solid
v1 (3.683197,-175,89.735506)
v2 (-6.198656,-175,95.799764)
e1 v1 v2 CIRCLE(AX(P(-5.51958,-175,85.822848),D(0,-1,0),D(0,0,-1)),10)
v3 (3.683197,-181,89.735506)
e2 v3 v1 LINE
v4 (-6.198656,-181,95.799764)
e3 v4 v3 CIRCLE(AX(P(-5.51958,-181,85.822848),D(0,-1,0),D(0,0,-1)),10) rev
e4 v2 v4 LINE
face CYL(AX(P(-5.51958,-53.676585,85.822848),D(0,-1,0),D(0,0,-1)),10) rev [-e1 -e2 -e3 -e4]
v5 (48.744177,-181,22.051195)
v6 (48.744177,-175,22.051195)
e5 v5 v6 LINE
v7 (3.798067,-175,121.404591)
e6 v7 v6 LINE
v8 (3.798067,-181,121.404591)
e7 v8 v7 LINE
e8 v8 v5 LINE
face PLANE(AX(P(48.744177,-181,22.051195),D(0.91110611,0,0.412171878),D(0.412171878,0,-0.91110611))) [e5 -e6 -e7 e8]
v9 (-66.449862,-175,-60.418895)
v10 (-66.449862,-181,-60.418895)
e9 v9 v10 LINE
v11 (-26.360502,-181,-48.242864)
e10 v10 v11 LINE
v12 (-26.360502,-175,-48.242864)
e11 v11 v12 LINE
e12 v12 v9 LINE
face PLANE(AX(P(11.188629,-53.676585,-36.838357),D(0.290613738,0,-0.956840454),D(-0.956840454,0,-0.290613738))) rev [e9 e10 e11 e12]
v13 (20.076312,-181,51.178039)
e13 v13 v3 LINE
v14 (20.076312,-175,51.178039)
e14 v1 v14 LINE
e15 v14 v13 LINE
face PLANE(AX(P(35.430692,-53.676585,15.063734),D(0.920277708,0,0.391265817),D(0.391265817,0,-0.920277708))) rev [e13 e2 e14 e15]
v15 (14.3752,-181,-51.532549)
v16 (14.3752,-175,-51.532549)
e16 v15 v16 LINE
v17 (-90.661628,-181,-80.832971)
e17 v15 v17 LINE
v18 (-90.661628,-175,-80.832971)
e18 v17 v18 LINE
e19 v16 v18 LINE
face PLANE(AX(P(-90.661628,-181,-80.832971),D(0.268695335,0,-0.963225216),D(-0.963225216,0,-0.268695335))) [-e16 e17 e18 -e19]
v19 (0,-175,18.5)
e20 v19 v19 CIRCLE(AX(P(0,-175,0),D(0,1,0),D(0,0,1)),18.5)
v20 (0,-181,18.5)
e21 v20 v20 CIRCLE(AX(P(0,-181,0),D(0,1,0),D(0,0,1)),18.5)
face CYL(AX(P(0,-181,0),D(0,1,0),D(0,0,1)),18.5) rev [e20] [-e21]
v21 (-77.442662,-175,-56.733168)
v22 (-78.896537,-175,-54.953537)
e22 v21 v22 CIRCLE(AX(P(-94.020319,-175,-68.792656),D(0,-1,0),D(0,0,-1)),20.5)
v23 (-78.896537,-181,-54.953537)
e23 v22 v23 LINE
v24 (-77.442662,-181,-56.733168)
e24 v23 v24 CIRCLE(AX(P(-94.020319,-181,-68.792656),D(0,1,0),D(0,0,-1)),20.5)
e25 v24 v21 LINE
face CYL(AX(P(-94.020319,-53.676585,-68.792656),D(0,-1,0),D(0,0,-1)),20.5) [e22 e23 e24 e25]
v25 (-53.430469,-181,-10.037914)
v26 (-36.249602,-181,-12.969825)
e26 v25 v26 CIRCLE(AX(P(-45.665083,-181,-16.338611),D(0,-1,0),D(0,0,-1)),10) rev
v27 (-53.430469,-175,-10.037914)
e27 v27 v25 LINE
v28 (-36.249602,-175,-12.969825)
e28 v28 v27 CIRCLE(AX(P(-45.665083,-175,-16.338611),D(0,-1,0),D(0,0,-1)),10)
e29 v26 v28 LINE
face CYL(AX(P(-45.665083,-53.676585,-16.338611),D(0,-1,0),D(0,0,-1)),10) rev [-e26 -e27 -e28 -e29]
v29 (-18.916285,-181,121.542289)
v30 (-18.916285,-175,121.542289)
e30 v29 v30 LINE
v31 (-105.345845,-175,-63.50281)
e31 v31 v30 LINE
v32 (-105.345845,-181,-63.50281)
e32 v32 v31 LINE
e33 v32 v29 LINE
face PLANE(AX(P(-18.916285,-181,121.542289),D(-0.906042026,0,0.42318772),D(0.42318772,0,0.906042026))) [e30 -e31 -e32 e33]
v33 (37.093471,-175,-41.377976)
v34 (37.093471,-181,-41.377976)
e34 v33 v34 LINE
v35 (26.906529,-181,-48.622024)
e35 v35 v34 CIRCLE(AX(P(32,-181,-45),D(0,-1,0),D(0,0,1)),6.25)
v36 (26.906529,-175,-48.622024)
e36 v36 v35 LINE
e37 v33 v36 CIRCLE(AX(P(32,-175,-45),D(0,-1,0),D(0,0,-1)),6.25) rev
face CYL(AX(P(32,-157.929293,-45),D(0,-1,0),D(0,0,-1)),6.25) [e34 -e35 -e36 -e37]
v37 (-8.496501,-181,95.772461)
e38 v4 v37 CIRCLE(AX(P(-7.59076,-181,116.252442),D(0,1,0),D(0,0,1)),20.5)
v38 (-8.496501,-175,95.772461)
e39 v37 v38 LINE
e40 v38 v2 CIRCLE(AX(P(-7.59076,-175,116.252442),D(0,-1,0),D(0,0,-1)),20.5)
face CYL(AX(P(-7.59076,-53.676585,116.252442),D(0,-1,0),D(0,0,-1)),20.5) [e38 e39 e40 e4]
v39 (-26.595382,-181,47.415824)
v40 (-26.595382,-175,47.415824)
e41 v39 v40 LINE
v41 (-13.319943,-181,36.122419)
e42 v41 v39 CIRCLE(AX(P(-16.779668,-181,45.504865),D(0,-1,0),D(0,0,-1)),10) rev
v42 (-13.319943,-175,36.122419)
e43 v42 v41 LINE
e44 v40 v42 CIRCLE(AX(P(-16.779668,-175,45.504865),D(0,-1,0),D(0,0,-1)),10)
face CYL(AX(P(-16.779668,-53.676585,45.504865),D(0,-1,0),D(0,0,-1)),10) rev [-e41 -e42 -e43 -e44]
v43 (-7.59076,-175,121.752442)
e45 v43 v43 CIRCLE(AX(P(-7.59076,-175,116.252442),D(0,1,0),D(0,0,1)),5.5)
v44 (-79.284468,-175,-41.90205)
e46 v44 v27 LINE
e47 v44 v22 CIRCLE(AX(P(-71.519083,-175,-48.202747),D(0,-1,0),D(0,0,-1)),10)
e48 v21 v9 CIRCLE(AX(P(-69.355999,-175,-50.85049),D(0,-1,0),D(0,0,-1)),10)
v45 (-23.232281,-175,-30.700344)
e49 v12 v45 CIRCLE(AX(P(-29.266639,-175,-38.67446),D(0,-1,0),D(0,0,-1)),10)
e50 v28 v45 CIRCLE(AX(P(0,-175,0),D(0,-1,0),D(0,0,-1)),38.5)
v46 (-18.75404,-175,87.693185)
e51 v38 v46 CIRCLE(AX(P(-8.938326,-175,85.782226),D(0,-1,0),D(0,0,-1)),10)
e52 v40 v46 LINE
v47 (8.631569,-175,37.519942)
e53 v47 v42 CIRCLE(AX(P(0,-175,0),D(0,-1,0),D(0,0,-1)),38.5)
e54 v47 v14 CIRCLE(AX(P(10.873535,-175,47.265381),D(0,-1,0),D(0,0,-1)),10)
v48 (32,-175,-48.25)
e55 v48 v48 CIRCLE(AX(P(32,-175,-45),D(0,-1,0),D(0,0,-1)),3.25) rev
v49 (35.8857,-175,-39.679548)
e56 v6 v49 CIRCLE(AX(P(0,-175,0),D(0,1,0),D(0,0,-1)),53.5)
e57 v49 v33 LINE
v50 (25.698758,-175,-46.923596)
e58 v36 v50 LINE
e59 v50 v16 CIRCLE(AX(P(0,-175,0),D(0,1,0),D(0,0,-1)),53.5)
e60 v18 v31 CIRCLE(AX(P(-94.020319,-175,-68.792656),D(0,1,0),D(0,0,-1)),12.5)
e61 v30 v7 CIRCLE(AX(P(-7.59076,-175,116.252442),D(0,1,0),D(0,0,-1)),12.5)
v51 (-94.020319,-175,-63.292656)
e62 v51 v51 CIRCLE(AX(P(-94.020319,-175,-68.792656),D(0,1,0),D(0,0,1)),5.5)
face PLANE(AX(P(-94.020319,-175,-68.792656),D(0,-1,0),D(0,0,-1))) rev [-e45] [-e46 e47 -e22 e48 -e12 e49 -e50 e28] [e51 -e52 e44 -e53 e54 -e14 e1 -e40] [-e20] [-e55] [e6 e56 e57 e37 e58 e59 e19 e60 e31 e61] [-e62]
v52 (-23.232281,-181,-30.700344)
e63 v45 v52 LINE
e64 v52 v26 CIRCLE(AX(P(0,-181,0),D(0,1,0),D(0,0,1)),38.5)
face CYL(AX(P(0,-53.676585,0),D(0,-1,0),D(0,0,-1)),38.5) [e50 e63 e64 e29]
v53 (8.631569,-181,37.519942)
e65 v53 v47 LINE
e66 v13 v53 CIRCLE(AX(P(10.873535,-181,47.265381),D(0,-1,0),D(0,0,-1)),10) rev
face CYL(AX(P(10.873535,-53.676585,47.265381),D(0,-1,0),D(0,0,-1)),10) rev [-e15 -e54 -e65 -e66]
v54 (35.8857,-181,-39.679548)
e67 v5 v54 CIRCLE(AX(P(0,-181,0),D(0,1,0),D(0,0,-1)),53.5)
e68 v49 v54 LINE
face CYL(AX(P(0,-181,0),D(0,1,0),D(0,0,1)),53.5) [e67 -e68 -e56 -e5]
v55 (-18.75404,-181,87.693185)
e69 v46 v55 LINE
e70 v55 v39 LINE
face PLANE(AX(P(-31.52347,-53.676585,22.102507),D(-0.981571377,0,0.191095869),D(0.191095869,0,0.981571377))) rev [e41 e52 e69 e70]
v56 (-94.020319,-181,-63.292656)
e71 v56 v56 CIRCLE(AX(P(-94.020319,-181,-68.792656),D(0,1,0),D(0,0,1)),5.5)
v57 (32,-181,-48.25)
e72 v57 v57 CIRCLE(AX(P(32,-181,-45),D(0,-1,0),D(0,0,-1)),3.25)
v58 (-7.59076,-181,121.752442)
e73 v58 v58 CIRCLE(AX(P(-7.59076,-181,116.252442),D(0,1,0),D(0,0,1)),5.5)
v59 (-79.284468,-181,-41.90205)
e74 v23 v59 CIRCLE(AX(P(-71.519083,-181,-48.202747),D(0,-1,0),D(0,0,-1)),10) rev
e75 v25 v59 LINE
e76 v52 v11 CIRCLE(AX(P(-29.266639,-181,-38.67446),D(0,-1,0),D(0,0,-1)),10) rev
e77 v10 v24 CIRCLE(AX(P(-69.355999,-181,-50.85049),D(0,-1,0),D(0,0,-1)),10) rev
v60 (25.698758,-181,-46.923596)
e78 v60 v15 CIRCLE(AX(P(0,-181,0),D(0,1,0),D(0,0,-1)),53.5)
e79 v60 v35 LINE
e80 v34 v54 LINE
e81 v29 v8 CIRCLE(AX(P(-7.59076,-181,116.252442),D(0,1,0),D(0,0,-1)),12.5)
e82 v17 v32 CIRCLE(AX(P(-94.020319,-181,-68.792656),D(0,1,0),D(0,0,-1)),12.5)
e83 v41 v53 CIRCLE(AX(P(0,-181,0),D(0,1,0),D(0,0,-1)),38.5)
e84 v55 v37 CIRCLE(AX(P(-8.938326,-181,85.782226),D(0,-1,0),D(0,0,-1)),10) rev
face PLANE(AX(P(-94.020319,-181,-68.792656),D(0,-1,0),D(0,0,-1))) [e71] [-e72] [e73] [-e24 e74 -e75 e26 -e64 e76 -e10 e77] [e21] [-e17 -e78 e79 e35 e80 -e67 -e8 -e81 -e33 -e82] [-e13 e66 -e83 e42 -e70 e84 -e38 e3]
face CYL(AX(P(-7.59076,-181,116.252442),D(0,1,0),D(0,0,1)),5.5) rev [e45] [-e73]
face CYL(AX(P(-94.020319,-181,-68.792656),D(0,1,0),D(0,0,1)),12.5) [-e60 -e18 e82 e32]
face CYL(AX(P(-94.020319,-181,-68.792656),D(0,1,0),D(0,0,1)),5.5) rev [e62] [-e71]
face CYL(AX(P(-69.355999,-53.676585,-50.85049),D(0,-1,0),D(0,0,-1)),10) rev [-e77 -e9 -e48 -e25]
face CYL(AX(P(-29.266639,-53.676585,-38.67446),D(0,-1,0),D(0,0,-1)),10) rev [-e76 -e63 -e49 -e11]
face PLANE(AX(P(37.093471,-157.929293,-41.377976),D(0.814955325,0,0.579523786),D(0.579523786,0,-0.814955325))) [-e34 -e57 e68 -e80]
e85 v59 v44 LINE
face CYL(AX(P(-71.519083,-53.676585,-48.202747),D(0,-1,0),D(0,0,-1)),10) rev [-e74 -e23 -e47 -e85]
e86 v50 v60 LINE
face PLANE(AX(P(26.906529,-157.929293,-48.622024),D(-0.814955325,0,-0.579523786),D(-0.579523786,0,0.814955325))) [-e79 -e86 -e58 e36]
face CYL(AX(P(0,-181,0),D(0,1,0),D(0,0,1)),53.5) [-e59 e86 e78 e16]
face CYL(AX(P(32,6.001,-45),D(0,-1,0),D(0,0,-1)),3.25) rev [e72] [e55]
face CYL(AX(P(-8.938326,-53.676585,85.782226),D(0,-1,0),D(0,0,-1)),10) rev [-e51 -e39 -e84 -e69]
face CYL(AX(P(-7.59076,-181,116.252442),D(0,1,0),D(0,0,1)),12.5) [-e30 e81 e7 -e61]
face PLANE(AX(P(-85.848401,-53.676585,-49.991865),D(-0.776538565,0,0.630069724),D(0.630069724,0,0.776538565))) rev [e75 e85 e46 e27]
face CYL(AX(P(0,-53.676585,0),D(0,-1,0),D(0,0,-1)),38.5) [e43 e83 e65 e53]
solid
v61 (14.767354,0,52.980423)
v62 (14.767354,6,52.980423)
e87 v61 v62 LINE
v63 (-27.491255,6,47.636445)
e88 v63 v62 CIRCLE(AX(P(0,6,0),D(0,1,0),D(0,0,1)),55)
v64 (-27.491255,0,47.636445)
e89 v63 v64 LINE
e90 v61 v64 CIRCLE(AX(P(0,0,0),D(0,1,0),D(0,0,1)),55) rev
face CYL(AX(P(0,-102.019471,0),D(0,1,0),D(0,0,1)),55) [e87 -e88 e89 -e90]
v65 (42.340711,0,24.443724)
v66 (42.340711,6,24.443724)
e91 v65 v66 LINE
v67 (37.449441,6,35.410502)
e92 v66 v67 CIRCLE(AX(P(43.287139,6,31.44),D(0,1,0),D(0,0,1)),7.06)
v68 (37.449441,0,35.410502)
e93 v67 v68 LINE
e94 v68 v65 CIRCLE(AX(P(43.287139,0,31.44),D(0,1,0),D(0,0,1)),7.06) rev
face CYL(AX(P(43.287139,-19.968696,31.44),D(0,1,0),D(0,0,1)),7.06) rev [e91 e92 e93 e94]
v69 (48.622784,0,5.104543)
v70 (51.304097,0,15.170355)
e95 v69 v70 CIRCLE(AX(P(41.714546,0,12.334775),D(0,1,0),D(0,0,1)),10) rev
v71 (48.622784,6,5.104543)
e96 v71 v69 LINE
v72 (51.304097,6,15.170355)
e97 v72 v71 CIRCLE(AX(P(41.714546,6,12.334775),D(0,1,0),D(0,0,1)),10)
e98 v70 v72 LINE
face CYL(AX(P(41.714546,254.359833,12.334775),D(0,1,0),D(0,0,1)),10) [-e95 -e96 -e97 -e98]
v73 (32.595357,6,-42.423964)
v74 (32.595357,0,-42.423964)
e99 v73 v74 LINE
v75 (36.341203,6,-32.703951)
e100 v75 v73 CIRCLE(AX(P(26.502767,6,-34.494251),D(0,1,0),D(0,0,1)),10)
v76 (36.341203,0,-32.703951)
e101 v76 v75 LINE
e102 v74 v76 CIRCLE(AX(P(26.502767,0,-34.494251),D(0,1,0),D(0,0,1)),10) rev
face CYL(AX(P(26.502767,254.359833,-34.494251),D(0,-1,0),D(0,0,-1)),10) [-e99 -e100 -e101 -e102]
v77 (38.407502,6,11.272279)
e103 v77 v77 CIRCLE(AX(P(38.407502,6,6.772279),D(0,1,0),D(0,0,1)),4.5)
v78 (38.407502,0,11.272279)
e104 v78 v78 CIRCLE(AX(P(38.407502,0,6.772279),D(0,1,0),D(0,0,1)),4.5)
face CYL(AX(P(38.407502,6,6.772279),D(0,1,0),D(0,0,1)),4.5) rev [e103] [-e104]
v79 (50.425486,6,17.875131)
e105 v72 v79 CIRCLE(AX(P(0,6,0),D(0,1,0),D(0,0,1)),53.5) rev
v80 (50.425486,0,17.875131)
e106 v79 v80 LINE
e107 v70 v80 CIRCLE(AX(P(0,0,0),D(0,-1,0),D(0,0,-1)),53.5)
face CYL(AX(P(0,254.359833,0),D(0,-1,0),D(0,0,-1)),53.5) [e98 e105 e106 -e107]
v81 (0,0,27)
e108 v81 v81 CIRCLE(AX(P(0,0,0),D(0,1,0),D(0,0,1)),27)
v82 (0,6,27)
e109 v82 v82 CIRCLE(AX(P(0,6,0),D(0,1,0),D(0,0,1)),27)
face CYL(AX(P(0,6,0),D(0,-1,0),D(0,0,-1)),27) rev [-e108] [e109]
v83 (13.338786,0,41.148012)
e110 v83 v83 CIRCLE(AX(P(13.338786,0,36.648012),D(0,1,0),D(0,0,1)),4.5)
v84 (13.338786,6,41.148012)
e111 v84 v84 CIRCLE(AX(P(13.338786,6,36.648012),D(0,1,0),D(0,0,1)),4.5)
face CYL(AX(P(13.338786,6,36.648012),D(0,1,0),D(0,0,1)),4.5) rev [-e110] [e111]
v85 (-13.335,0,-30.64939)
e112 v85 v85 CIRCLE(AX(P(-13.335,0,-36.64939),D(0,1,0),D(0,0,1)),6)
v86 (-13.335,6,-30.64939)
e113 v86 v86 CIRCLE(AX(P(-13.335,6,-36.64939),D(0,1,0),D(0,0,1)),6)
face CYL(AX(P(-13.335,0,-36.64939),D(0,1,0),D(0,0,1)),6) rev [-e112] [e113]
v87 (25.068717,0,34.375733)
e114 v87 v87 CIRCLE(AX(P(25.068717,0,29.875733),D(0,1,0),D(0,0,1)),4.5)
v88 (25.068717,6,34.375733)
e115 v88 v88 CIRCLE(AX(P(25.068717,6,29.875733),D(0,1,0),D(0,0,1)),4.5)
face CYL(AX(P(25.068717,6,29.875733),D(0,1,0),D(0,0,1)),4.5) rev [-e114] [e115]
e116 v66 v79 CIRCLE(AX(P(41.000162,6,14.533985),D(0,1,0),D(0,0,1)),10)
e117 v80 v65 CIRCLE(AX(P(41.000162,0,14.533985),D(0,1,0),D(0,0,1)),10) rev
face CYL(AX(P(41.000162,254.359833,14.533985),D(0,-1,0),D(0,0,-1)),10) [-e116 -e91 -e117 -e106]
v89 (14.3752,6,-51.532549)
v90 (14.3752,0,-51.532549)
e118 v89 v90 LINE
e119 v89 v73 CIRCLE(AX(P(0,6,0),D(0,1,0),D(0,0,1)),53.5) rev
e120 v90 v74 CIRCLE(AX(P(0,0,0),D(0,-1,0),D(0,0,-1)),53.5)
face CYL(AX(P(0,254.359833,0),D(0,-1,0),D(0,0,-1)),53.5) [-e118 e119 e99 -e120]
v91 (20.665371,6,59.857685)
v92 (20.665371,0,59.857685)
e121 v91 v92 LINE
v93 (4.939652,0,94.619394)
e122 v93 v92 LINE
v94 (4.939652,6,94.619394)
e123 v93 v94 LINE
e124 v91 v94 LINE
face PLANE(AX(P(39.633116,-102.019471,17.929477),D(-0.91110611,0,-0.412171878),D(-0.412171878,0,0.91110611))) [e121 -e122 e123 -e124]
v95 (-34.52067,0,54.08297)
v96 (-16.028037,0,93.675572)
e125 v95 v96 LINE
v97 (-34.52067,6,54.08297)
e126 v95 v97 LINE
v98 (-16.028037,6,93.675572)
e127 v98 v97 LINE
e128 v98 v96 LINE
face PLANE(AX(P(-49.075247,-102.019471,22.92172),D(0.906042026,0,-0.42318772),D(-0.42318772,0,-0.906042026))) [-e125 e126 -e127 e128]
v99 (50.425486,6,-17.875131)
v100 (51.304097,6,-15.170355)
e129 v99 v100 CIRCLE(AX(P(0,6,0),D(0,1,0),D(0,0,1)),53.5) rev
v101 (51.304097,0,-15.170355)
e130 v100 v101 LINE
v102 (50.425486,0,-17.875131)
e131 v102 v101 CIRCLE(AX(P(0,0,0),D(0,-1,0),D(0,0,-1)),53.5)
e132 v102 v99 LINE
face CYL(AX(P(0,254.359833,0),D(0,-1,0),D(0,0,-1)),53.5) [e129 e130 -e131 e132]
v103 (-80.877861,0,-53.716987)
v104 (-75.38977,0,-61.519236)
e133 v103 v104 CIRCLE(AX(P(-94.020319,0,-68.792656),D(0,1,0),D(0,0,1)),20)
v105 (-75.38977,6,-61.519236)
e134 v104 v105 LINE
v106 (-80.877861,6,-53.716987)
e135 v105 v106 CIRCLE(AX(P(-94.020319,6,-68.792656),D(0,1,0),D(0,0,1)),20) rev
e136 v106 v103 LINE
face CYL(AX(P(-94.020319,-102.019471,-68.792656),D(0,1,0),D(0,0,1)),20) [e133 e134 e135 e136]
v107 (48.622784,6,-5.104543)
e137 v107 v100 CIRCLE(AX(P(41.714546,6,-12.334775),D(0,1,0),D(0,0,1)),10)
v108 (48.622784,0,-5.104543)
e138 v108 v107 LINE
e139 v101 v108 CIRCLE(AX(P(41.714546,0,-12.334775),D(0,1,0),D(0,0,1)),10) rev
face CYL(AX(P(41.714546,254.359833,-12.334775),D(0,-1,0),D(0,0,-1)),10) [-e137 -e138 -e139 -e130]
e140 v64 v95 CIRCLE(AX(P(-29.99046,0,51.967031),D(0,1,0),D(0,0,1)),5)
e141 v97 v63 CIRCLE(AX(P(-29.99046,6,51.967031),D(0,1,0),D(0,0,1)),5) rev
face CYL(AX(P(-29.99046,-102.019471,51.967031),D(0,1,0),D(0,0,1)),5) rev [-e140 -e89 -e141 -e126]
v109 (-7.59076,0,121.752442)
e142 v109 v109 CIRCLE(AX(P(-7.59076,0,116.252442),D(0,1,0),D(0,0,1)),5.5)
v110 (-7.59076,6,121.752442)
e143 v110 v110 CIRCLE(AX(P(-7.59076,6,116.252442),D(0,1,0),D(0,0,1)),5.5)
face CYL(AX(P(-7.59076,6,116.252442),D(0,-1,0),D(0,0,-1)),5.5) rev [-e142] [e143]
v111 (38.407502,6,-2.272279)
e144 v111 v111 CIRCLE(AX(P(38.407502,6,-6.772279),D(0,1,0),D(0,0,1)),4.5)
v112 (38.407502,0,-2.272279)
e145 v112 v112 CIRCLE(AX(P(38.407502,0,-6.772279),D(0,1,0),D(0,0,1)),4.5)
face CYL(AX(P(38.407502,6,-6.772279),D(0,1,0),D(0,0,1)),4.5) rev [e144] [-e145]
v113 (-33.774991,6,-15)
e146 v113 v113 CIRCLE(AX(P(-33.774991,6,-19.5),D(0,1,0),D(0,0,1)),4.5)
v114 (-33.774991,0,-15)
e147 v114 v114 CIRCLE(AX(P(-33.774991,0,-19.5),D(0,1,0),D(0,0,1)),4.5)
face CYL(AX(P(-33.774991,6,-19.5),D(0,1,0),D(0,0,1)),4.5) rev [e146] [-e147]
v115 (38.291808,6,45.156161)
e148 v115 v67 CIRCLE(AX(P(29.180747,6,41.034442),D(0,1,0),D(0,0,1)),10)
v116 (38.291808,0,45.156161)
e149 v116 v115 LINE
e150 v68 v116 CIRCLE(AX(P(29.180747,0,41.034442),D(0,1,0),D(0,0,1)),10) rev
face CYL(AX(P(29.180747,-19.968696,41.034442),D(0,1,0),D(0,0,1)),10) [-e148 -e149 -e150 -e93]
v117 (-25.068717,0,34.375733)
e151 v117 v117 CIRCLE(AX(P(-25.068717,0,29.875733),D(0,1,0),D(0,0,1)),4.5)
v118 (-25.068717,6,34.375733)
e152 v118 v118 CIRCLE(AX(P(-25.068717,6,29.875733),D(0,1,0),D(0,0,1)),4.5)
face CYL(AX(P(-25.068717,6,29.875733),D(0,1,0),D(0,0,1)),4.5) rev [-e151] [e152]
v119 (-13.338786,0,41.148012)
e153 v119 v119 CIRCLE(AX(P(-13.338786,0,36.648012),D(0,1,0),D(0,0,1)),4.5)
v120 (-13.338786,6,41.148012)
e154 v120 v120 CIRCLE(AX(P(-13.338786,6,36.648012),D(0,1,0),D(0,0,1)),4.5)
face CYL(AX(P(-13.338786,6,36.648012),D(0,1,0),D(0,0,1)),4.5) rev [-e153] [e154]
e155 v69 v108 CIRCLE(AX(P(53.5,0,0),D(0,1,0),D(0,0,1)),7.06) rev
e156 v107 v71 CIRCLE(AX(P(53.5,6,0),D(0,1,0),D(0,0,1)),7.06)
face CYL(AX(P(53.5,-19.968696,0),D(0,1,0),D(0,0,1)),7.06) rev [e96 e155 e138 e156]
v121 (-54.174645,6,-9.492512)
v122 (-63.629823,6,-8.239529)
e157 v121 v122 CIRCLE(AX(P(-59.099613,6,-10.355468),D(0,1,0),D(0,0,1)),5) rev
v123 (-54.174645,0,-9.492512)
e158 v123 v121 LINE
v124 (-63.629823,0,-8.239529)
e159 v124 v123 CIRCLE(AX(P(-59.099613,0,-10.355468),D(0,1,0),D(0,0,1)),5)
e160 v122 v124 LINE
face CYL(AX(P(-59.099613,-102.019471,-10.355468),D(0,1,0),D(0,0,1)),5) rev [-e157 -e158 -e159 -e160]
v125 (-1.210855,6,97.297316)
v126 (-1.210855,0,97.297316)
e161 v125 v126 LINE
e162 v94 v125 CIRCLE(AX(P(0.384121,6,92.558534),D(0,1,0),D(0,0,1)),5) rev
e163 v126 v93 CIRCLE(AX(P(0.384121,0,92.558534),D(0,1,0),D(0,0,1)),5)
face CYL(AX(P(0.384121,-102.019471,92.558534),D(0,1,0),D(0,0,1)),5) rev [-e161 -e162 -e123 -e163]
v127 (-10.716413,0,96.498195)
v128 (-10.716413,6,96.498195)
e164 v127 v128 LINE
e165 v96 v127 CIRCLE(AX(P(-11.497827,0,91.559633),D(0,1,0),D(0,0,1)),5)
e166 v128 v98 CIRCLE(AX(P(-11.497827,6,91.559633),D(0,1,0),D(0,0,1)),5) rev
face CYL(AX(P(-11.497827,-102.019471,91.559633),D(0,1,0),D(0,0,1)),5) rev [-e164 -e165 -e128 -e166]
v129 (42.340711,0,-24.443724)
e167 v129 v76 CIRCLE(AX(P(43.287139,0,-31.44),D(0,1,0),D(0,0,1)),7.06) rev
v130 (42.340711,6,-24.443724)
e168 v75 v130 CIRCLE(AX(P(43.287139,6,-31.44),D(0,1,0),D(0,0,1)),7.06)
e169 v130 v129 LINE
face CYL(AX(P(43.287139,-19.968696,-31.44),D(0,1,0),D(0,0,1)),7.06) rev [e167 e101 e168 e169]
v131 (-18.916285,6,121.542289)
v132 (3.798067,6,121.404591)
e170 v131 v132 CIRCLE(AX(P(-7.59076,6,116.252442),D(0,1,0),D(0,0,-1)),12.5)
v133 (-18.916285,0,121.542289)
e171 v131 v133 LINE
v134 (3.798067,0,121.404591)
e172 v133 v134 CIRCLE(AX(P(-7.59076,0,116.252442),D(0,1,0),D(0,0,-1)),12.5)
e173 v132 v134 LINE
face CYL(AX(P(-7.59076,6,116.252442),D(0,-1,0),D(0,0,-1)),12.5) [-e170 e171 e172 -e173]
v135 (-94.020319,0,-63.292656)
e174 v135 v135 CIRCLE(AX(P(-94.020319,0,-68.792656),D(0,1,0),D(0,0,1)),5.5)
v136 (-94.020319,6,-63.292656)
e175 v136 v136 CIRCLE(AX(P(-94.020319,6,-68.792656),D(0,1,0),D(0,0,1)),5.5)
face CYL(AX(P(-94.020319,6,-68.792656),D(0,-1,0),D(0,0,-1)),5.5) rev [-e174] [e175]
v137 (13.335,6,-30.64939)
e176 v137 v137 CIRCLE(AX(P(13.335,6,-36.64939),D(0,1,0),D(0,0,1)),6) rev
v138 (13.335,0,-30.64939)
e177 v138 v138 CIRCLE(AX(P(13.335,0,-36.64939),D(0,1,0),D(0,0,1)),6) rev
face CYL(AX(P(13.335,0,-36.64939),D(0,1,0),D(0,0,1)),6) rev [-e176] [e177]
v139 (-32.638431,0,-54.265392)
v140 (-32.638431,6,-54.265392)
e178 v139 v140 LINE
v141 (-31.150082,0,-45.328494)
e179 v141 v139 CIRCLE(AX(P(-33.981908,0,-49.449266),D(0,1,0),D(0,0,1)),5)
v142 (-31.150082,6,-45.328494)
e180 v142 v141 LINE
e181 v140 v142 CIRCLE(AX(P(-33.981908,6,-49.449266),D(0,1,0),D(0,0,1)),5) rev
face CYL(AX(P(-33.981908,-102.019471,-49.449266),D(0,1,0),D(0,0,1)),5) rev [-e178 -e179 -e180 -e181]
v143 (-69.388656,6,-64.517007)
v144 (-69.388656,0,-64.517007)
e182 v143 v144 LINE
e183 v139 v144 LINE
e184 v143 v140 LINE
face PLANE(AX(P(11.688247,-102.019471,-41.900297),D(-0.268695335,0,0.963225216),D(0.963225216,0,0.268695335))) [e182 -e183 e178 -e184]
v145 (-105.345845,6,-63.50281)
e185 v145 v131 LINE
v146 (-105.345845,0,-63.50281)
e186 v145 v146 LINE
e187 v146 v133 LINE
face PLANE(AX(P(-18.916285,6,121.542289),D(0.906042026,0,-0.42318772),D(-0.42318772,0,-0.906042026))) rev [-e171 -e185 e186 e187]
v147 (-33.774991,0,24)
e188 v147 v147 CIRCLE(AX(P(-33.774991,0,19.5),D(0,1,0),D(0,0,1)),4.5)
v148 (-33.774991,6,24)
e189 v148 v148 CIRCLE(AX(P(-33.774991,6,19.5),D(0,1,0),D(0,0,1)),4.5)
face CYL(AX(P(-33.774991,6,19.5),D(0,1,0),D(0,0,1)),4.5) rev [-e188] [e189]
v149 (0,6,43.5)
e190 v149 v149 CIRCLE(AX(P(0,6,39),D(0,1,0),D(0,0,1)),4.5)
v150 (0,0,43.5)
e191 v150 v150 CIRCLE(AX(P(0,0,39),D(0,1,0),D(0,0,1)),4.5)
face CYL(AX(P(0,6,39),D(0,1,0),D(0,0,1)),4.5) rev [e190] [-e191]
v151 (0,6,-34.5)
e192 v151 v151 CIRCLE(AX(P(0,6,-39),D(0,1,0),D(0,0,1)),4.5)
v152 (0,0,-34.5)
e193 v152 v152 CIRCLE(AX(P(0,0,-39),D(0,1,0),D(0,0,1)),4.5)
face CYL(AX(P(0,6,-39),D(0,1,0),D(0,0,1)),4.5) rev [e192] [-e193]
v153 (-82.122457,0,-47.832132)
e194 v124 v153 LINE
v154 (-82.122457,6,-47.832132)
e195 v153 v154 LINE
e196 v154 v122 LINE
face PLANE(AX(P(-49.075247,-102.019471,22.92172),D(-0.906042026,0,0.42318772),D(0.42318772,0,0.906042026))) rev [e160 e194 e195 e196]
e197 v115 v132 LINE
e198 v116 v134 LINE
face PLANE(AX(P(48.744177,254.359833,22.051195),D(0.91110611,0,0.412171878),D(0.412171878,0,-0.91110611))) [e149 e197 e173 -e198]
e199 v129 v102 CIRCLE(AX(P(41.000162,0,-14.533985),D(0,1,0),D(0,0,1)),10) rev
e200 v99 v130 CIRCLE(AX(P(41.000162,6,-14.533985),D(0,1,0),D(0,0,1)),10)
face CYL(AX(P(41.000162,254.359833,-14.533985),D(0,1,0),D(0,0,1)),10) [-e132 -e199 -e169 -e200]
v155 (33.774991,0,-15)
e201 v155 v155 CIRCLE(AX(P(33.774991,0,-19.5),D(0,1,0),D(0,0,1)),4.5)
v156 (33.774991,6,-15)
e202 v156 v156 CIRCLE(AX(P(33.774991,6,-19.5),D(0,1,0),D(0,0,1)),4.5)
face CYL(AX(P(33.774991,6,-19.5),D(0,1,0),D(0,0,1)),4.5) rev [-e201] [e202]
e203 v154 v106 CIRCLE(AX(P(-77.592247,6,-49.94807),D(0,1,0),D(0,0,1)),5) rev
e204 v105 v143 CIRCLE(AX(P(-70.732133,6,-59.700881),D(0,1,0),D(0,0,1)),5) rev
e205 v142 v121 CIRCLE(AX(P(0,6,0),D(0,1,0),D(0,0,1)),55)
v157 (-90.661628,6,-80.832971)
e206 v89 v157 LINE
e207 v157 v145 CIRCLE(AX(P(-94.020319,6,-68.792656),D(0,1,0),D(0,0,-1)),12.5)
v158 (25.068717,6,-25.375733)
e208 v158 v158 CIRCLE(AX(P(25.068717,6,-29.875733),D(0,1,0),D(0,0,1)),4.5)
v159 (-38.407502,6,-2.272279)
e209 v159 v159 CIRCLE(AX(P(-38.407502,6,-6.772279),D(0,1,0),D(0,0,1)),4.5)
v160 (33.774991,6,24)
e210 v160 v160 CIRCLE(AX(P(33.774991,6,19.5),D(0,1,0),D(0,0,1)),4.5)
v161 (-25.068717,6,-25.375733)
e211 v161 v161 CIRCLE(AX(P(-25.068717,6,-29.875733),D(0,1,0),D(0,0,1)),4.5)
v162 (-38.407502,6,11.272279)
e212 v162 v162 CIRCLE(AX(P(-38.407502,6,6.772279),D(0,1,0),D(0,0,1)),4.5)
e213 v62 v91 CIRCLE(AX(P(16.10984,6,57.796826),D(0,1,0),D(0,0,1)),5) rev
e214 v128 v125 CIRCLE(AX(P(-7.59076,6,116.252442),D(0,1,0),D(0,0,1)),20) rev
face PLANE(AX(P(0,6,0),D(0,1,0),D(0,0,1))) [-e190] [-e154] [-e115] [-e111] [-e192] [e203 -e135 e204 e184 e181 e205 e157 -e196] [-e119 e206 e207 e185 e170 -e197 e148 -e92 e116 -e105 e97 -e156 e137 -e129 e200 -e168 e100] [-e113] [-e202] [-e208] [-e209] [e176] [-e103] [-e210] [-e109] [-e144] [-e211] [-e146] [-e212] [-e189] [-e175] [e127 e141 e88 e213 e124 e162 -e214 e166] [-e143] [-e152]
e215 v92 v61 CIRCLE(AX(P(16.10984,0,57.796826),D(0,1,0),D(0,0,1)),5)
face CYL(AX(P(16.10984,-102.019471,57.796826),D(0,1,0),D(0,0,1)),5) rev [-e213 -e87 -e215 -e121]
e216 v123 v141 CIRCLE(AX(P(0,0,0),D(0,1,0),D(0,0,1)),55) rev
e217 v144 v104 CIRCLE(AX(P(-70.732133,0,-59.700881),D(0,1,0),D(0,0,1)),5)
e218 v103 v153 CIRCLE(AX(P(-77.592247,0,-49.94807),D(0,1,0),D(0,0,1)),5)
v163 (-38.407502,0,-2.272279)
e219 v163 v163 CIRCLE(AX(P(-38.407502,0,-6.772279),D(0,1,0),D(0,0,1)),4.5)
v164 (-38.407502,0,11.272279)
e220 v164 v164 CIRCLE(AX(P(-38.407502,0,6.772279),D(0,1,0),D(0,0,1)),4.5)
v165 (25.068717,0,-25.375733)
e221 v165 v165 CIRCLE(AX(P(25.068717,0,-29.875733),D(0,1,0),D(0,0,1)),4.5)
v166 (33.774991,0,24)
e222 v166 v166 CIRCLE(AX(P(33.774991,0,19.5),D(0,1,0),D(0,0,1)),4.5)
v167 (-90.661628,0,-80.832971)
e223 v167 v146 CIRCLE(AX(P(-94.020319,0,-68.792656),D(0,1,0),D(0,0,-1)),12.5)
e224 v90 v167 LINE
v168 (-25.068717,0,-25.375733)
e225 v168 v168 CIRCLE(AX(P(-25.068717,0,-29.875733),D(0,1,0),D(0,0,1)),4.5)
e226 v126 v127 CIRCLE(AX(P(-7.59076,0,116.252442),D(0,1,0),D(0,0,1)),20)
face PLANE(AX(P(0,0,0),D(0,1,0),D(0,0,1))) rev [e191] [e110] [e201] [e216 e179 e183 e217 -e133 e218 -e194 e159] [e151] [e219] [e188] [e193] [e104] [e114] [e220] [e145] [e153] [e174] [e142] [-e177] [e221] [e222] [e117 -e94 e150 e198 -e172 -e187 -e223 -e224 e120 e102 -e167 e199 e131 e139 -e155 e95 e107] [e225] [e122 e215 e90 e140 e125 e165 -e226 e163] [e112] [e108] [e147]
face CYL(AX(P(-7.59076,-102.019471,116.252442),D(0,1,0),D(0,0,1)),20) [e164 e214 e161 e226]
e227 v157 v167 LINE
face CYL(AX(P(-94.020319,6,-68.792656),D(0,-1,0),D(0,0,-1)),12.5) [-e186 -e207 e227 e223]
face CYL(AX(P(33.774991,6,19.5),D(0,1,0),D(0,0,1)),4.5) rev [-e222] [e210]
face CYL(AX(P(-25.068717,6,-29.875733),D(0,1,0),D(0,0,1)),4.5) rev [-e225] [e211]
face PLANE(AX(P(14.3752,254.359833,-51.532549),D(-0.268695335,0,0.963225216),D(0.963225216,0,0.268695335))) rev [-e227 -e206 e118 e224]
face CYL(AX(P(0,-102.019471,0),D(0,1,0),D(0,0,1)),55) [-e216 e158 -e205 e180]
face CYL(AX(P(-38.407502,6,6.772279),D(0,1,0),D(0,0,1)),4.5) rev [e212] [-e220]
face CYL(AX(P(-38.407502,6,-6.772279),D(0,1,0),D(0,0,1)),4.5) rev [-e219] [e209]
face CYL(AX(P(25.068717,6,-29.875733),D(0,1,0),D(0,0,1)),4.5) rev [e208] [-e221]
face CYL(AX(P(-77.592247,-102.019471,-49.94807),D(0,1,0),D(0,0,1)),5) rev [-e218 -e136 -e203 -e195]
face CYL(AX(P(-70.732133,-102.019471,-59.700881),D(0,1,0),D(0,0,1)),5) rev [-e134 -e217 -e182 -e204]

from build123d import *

# Parameters (mm, degrees)
SKETCH1_R            = 27
SKETCH1_R_2          = 5.500000000000008
SKETCH1_R_3          = 5.500000000000017
BOSS_EXTRUDE1_DEPTH  = 6
M8_CLEARANCE_HOLE1_D = 9
SKETCH4_R            = 5.999999999999999
CUT_EXTRUDE1_DEPTH   = 168.21175155495473
BOSS_EXTRUDE3_DEPTH  = 6
SKETCH9_R            = 18.5
SKETCH9_R_2          = 5.500000000000017
SKETCH9_R_3          = 5.500000000000006
BOSS_EXTRUDE2_DEPTH  = 6
SKETCH7_R            = 7.059999999999994
SKETCH7_R_2          = 7.0600000000000005
SKETCH7_R_3          = 7.059999999999993
CUT_EXTRUDE4_DEPTH   = 6
FILLET1_R            = 10
CUT_EXTRUDE5_DEPTH   = 6
FILLET2_R            = 5
CUT_EXTRUDE6_DEPTH   = 6
FILLET3_R            = 10
BOSS_EXTRUDE4_DEPTH  = 6
SKETCH19_R           = 3.2500000000000013
CUT_EXTRUDE7_DEPTH   = 6


with BuildPart() as part:
    # Sketch1 → Boss-Extrude1 (new body)
    with BuildSketch(Plane(origin=(0, 0, 0), x_dir=(1, 0, 0), z_dir=(0, 1, 0))):
        with BuildLine():
            Line((43.10169024537115, -16.069981269188727), (4.121656155384393, -120.61928515182078))
            ThreePointArc((4.121656155384393, -120.61928515182078), (-7.090354785618229, -128.74242219741816), (-18.916285003056604, -121.542288914277))
            Line((-18.916285003056604, -121.542288914277), (-105.34584466052408, 63.502809745719105))
            ThreePointArc((-105.34584466052408, 63.502809745719105), (-103.27710977103428, 77.19276521532294), (-89.85172700954884, 80.57708826585134))
            Line((-89.85172700954884, 80.57708826585134), (15.340419737897069, 43.366709839059006))
            ThreePointArc((15.340419737897069, 43.366709839059006), (41.67793321769229, 19.46663511502645), (43.10169024537115, -16.069981269188727))
        make_face()
        with Locations(Location((0, 0, 0), (0, 0, 270))):
            Circle(SKETCH1_R, mode=Mode.SUBTRACT)
        with Locations(Location((-7.590759672162107, -116.25244241562818, 0), (0, 0, 270))):
            Circle(SKETCH1_R_2, mode=Mode.SUBTRACT)
        with Locations(Location((-94.02031932962956, 68.79265624436792, 0), (0, 0, 270))):
            Circle(SKETCH1_R_3, mode=Mode.SUBTRACT)
    extrude(amount=BOSS_EXTRUDE1_DEPTH)

    # M8 Clearance Hole1 (through all)
    with Locations(Plane(origin=(0, 6, 0), x_dir=(1, 0, 0), z_dir=(0, 1, 0))):
        with Locations((0, 39), (25.068716778, 29.875733282), (33.774990748, 19.5), (38.407502367, 6.772278929), (38.407502367, -6.772278929), (33.774990748, -19.5), (25.068716778, -29.875733282), (13.33878559, -36.648012211), (0, -39), (-13.33878559, -36.648012211), (-25.068716778, -29.875733282), (-33.774990748, -19.5), (-38.407502367, -6.772278929), (-38.407502367, 6.772278929), (-33.774990748, 19.5), (-25.068716778, 29.875733282)):
            Hole(M8_CLEARANCE_HOLE1_D / 2)

    # Sketch4 → Cut-Extrude1 (cut, through all)
    with BuildSketch(Plane(origin=(0, 6, 0), x_dir=(1, 0, 0), z_dir=(0, 1, 0))):
        with Locations(Location((-13.335, 36.64938983121001, 0), (0, 0, 270))):
            Circle(SKETCH4_R)
        with Locations(Location((13.335, 36.64938983121001, 0), (0, 0, 270))):
            Circle(SKETCH4_R)
    extrude(amount=-CUT_EXTRUDE1_DEPTH, mode=Mode.SUBTRACT)

    # Sketch13 → Boss-Extrude3 (add)
    with BuildSketch(Plane.XZ):
        with BuildLine():
            Line((48.74417686435453, 22.051195473636422), (3.798066698014179, 121.40459089077687))
            Line((3.798066698014179, 121.40459089077687), (43.10169024537115, 16.069981269188727))
            ThreePointArc((43.10169024537115, 16.069981269188727), (41.67793321769229, -19.46663511502645), (15.340419737897069, -43.366709839059006))
            Line((15.340419737897069, -43.366709839059006), (-90.66162764448717, -80.83297144639462))
            Line((-90.66162764448717, -80.83297144639462), (14.37520041240948, -51.53254906467429))
            ThreePointArc((14.37520041240948, -51.53254906467429), (48.473248416229154, -22.640543014215424), (48.74417686435453, 22.051195473636422))
        make_face()
    extrude(amount=-BOSS_EXTRUDE3_DEPTH)

    # Sketch7 → Cut-Extrude4 (cut)
    with BuildSketch(Plane(origin=(0, 6, 0), x_dir=(1, 0, 0), z_dir=(0, 1, 0))):
        with Locations((43.28713896759637, 31.44)):
            Circle(SKETCH7_R)
        with Locations((53.5, 0)):
            Circle(SKETCH7_R_2)
        with Locations((43.28713896759637, -31.44)):
            Circle(SKETCH7_R_3)
    extrude(amount=-CUT_EXTRUDE4_DEPTH, mode=Mode.SUBTRACT)

    # Fillet1
    fillet1_edges = [part.edges().sort_by_distance(p)[0] for p in [
        (47.050098611701245, 3, -25.46641358003106),
        (38.77037136127814, 3, -36.866086102386646),
        (53.034171962616824, 3, 7.0446152655477015),
        (53.034171962616824, 3, -7.044615265547705),
        (47.16556143663344, 3, 25.54072554023223),
        (41.41704833354494, 3, 38.24781617116921),
    ]]
    fillet(fillet1_edges, radius=FILLET1_R)

    # Sketch14 → Cut-Extrude5 (cut)
    with BuildSketch(Plane(origin=(0, 6, 0), x_dir=(1, 0, 0), z_dir=(0, 1, 0))):
        with BuildLine():
            Line((-74.23517315376525, 65.86896152711691), (-20.730399437587575, 50.943601552678516))
            ThreePointArc((-20.730399437587575, 50.943601552678516), (-49.25962394873262, 24.46404399173302), (-53.116964372688535, -14.268430040846713))
            Line((-53.116964372688535, -14.268430040846713), (-83.86494519848478, 51.56278752007186))
            ThreePointArc((-83.86494519848478, 51.56278752007186), (-77.42889555879034, 57.62463684715917), (-74.23517315376525, 65.86896152711691))
        make_face()
        with BuildLine():
            Line((-14.285548146168242, -97.40622774826556), (-45.0335289719607, -31.575010187355062))
            ThreePointArc((-45.0335289719607, -31.575010187355062), (-12.85572984750795, -53.47644537633268), (25.76091414072229, -48.5939842226827))
            Line((25.76091414072229, -48.5939842226827), (2.865787751627601, -99.20367073042938))
            ThreePointArc((2.865787751627601, -99.20367073042938), (-5.506195468880833, -96.36137426727582), (-14.285548146168242, -97.40622774826556))
        make_face()
    extrude(amount=-CUT_EXTRUDE5_DEPTH, mode=Mode.SUBTRACT)

    # Fillet2
    fillet2_edges = [part.edges().sort_by_distance(p)[0] for p in [
        (-74.23517315376525, 3, -65.86896152711691),
        (-20.730399437587575, 3, -50.943601552678516),
        (-53.116964372688535, 3, 14.268430040846713),
        (-83.86494519848478, 3, -51.56278752007185),
        (-14.285548146168242, 3, 97.40622774826556),
        (-45.033528971960706, 3, 31.575010187355062),
        (25.76091414072229, 3, 48.5939842226827),
        (2.865787751627601, 3, 99.20367073042938),
    ]]
    fillet(fillet2_edges, radius=FILLET2_R)


with BuildPart() as body_2:
    # Sketch9 → Boss-Extrude2 (new body)
    with BuildSketch(Plane(origin=(0, -175, 0), x_dir=(1, 0, 0), z_dir=(0, 1, 0))):
        with BuildLine():
            Line((-90.66162764448717, 80.83297144639464), (14.375200412409482, 51.53254906467428))
            ThreePointArc((14.375200412409482, 51.53254906467428), (48.47324841622914, 22.640543014215417), (48.74417686435452, -22.051195473636422))
            Line((48.74417686435452, -22.051195473636422), (3.7980666980141717, -121.40459089077687))
            ThreePointArc((3.7980666980141717, -121.40459089077687), (-7.514984070465397, -128.75221273584555), (-18.916285003056604, -121.542288914277))
            Line((-18.916285003056604, -121.542288914277), (-105.34584466052408, 63.502809745719105))
            ThreePointArc((-105.34584466052408, 63.502809745719105), (-103.55715505893005, 76.87342132400846), (-90.66162764448717, 80.83297144639464))
        make_face()
        with Locations(Location((0, 0, 0), (0, 0, 270))):
            Circle(SKETCH9_R, mode=Mode.SUBTRACT)
        with Locations(Location((-94.02031932962956, 68.79265624436792, 0), (0, 0, 270))):
            Circle(SKETCH9_R_2, mode=Mode.SUBTRACT)
        with Locations(Location((-7.590759672162106, -116.25244241562818, 0), (0, 0, 270))):
            Circle(SKETCH9_R_3, mode=Mode.SUBTRACT)
    extrude(amount=-BOSS_EXTRUDE2_DEPTH)

    # Sketch15 → Cut-Extrude6 (cut)
    with BuildSketch(Plane.XZ.offset(181)):
        with BuildLine():
            Line((11.188628918305138, -36.83835749498702), (-74.40509001411698, -62.83507461254312))
            ThreePointArc((-74.40509001411698, -62.83507461254312), (-78.71449045511118, -55.15514905045745), (-85.84840137943056, -49.991864851045776))
            Line((-85.84840137943056, -49.991864851045776), (-37.181875060882554, 9.987901028590548))
            ThreePointArc((-37.181875060882554, 9.987901028590548), (-26.778477049421305, -27.661582870718316), (11.188628918305138, -36.83835749498702))
        make_face()
        with BuildLine():
            Line((35.430691763053375, 15.063733972408766), (0.43018958587372463, 97.38674939893741))
            ThreePointArc((0.43018958587372463, 97.38674939893741), (-8.22505248389858, 95.76225762805294), (-16.763243284449498, 97.91898817529693))
            Line((-16.763243284449498, 97.91898817529693), (-31.523470280374102, 22.10250713114625))
            ThreePointArc((-31.523470280374102, 22.10250713114625), (4.025254876864121, 38.288997416702905), (35.430691763053375, 15.063733972408766))
        make_face()
    extrude(amount=-CUT_EXTRUDE6_DEPTH, mode=Mode.SUBTRACT)

    # Fillet3
    fillet3_edges = [body_2.edges().sort_by_distance(p)[0] for p in [
        (-37.18187506088256, -178, 9.98790102859055),
        (-74.40509001411698, -178, -62.83507461254312),
        (-85.84840137943056, -178, -49.991864851045776),
        (-16.763243284449494, -178, 97.91898817529693),
        (0.4301895858737248, -178, 97.38674939893741),
        (35.430691763053375, -178, 15.06373397240877),
        (-31.523470280374102, -178, 22.10250713114625),
    ]]
    fillet(fillet3_edges, radius=FILLET3_R)
    fillet3_2_edges = [body_2.edges().sort_by_distance(p)[0] for p in [
        (11.188628918305138, -178, -36.83835749498702),
    ]]
    fillet(fillet3_2_edges, radius=FILLET3_R)

    # Sketch17 → Boss-Extrude4 (add)
    with BuildSketch(Plane.XZ.offset(181)):
        with BuildLine():
            Line((37.093470778554746, -41.37797633524996), (35.885699739475456, -39.679548311544714))
            ThreePointArc((35.885699739475456, -39.679548311544714), (31.0045225702602, -43.600109864428376), (25.698758182366007, -46.92359564104476))
            Line((25.698758182366007, -46.92359564104476), (26.9065292214453, -48.62202366475002))
            ThreePointArc((26.9065292214453, -48.62202366475002), (35.622023664750046, -50.093470778554725), (37.093470778554746, -41.37797633524996))
        make_face()
    extrude(amount=-BOSS_EXTRUDE4_DEPTH)

    # Sketch19 → Cut-Extrude7 (cut)
    with BuildSketch(Plane.XZ.offset(181)):
        with Locations(Location((32.000000000000014, -44.99999999999999, 0), (0, 0, 270))):
            Circle(SKETCH19_R)
    extrude(amount=-CUT_EXTRUDE7_DEPTH, mode=Mode.SUBTRACT)


solid = Compound([part.part, body_2.part])
